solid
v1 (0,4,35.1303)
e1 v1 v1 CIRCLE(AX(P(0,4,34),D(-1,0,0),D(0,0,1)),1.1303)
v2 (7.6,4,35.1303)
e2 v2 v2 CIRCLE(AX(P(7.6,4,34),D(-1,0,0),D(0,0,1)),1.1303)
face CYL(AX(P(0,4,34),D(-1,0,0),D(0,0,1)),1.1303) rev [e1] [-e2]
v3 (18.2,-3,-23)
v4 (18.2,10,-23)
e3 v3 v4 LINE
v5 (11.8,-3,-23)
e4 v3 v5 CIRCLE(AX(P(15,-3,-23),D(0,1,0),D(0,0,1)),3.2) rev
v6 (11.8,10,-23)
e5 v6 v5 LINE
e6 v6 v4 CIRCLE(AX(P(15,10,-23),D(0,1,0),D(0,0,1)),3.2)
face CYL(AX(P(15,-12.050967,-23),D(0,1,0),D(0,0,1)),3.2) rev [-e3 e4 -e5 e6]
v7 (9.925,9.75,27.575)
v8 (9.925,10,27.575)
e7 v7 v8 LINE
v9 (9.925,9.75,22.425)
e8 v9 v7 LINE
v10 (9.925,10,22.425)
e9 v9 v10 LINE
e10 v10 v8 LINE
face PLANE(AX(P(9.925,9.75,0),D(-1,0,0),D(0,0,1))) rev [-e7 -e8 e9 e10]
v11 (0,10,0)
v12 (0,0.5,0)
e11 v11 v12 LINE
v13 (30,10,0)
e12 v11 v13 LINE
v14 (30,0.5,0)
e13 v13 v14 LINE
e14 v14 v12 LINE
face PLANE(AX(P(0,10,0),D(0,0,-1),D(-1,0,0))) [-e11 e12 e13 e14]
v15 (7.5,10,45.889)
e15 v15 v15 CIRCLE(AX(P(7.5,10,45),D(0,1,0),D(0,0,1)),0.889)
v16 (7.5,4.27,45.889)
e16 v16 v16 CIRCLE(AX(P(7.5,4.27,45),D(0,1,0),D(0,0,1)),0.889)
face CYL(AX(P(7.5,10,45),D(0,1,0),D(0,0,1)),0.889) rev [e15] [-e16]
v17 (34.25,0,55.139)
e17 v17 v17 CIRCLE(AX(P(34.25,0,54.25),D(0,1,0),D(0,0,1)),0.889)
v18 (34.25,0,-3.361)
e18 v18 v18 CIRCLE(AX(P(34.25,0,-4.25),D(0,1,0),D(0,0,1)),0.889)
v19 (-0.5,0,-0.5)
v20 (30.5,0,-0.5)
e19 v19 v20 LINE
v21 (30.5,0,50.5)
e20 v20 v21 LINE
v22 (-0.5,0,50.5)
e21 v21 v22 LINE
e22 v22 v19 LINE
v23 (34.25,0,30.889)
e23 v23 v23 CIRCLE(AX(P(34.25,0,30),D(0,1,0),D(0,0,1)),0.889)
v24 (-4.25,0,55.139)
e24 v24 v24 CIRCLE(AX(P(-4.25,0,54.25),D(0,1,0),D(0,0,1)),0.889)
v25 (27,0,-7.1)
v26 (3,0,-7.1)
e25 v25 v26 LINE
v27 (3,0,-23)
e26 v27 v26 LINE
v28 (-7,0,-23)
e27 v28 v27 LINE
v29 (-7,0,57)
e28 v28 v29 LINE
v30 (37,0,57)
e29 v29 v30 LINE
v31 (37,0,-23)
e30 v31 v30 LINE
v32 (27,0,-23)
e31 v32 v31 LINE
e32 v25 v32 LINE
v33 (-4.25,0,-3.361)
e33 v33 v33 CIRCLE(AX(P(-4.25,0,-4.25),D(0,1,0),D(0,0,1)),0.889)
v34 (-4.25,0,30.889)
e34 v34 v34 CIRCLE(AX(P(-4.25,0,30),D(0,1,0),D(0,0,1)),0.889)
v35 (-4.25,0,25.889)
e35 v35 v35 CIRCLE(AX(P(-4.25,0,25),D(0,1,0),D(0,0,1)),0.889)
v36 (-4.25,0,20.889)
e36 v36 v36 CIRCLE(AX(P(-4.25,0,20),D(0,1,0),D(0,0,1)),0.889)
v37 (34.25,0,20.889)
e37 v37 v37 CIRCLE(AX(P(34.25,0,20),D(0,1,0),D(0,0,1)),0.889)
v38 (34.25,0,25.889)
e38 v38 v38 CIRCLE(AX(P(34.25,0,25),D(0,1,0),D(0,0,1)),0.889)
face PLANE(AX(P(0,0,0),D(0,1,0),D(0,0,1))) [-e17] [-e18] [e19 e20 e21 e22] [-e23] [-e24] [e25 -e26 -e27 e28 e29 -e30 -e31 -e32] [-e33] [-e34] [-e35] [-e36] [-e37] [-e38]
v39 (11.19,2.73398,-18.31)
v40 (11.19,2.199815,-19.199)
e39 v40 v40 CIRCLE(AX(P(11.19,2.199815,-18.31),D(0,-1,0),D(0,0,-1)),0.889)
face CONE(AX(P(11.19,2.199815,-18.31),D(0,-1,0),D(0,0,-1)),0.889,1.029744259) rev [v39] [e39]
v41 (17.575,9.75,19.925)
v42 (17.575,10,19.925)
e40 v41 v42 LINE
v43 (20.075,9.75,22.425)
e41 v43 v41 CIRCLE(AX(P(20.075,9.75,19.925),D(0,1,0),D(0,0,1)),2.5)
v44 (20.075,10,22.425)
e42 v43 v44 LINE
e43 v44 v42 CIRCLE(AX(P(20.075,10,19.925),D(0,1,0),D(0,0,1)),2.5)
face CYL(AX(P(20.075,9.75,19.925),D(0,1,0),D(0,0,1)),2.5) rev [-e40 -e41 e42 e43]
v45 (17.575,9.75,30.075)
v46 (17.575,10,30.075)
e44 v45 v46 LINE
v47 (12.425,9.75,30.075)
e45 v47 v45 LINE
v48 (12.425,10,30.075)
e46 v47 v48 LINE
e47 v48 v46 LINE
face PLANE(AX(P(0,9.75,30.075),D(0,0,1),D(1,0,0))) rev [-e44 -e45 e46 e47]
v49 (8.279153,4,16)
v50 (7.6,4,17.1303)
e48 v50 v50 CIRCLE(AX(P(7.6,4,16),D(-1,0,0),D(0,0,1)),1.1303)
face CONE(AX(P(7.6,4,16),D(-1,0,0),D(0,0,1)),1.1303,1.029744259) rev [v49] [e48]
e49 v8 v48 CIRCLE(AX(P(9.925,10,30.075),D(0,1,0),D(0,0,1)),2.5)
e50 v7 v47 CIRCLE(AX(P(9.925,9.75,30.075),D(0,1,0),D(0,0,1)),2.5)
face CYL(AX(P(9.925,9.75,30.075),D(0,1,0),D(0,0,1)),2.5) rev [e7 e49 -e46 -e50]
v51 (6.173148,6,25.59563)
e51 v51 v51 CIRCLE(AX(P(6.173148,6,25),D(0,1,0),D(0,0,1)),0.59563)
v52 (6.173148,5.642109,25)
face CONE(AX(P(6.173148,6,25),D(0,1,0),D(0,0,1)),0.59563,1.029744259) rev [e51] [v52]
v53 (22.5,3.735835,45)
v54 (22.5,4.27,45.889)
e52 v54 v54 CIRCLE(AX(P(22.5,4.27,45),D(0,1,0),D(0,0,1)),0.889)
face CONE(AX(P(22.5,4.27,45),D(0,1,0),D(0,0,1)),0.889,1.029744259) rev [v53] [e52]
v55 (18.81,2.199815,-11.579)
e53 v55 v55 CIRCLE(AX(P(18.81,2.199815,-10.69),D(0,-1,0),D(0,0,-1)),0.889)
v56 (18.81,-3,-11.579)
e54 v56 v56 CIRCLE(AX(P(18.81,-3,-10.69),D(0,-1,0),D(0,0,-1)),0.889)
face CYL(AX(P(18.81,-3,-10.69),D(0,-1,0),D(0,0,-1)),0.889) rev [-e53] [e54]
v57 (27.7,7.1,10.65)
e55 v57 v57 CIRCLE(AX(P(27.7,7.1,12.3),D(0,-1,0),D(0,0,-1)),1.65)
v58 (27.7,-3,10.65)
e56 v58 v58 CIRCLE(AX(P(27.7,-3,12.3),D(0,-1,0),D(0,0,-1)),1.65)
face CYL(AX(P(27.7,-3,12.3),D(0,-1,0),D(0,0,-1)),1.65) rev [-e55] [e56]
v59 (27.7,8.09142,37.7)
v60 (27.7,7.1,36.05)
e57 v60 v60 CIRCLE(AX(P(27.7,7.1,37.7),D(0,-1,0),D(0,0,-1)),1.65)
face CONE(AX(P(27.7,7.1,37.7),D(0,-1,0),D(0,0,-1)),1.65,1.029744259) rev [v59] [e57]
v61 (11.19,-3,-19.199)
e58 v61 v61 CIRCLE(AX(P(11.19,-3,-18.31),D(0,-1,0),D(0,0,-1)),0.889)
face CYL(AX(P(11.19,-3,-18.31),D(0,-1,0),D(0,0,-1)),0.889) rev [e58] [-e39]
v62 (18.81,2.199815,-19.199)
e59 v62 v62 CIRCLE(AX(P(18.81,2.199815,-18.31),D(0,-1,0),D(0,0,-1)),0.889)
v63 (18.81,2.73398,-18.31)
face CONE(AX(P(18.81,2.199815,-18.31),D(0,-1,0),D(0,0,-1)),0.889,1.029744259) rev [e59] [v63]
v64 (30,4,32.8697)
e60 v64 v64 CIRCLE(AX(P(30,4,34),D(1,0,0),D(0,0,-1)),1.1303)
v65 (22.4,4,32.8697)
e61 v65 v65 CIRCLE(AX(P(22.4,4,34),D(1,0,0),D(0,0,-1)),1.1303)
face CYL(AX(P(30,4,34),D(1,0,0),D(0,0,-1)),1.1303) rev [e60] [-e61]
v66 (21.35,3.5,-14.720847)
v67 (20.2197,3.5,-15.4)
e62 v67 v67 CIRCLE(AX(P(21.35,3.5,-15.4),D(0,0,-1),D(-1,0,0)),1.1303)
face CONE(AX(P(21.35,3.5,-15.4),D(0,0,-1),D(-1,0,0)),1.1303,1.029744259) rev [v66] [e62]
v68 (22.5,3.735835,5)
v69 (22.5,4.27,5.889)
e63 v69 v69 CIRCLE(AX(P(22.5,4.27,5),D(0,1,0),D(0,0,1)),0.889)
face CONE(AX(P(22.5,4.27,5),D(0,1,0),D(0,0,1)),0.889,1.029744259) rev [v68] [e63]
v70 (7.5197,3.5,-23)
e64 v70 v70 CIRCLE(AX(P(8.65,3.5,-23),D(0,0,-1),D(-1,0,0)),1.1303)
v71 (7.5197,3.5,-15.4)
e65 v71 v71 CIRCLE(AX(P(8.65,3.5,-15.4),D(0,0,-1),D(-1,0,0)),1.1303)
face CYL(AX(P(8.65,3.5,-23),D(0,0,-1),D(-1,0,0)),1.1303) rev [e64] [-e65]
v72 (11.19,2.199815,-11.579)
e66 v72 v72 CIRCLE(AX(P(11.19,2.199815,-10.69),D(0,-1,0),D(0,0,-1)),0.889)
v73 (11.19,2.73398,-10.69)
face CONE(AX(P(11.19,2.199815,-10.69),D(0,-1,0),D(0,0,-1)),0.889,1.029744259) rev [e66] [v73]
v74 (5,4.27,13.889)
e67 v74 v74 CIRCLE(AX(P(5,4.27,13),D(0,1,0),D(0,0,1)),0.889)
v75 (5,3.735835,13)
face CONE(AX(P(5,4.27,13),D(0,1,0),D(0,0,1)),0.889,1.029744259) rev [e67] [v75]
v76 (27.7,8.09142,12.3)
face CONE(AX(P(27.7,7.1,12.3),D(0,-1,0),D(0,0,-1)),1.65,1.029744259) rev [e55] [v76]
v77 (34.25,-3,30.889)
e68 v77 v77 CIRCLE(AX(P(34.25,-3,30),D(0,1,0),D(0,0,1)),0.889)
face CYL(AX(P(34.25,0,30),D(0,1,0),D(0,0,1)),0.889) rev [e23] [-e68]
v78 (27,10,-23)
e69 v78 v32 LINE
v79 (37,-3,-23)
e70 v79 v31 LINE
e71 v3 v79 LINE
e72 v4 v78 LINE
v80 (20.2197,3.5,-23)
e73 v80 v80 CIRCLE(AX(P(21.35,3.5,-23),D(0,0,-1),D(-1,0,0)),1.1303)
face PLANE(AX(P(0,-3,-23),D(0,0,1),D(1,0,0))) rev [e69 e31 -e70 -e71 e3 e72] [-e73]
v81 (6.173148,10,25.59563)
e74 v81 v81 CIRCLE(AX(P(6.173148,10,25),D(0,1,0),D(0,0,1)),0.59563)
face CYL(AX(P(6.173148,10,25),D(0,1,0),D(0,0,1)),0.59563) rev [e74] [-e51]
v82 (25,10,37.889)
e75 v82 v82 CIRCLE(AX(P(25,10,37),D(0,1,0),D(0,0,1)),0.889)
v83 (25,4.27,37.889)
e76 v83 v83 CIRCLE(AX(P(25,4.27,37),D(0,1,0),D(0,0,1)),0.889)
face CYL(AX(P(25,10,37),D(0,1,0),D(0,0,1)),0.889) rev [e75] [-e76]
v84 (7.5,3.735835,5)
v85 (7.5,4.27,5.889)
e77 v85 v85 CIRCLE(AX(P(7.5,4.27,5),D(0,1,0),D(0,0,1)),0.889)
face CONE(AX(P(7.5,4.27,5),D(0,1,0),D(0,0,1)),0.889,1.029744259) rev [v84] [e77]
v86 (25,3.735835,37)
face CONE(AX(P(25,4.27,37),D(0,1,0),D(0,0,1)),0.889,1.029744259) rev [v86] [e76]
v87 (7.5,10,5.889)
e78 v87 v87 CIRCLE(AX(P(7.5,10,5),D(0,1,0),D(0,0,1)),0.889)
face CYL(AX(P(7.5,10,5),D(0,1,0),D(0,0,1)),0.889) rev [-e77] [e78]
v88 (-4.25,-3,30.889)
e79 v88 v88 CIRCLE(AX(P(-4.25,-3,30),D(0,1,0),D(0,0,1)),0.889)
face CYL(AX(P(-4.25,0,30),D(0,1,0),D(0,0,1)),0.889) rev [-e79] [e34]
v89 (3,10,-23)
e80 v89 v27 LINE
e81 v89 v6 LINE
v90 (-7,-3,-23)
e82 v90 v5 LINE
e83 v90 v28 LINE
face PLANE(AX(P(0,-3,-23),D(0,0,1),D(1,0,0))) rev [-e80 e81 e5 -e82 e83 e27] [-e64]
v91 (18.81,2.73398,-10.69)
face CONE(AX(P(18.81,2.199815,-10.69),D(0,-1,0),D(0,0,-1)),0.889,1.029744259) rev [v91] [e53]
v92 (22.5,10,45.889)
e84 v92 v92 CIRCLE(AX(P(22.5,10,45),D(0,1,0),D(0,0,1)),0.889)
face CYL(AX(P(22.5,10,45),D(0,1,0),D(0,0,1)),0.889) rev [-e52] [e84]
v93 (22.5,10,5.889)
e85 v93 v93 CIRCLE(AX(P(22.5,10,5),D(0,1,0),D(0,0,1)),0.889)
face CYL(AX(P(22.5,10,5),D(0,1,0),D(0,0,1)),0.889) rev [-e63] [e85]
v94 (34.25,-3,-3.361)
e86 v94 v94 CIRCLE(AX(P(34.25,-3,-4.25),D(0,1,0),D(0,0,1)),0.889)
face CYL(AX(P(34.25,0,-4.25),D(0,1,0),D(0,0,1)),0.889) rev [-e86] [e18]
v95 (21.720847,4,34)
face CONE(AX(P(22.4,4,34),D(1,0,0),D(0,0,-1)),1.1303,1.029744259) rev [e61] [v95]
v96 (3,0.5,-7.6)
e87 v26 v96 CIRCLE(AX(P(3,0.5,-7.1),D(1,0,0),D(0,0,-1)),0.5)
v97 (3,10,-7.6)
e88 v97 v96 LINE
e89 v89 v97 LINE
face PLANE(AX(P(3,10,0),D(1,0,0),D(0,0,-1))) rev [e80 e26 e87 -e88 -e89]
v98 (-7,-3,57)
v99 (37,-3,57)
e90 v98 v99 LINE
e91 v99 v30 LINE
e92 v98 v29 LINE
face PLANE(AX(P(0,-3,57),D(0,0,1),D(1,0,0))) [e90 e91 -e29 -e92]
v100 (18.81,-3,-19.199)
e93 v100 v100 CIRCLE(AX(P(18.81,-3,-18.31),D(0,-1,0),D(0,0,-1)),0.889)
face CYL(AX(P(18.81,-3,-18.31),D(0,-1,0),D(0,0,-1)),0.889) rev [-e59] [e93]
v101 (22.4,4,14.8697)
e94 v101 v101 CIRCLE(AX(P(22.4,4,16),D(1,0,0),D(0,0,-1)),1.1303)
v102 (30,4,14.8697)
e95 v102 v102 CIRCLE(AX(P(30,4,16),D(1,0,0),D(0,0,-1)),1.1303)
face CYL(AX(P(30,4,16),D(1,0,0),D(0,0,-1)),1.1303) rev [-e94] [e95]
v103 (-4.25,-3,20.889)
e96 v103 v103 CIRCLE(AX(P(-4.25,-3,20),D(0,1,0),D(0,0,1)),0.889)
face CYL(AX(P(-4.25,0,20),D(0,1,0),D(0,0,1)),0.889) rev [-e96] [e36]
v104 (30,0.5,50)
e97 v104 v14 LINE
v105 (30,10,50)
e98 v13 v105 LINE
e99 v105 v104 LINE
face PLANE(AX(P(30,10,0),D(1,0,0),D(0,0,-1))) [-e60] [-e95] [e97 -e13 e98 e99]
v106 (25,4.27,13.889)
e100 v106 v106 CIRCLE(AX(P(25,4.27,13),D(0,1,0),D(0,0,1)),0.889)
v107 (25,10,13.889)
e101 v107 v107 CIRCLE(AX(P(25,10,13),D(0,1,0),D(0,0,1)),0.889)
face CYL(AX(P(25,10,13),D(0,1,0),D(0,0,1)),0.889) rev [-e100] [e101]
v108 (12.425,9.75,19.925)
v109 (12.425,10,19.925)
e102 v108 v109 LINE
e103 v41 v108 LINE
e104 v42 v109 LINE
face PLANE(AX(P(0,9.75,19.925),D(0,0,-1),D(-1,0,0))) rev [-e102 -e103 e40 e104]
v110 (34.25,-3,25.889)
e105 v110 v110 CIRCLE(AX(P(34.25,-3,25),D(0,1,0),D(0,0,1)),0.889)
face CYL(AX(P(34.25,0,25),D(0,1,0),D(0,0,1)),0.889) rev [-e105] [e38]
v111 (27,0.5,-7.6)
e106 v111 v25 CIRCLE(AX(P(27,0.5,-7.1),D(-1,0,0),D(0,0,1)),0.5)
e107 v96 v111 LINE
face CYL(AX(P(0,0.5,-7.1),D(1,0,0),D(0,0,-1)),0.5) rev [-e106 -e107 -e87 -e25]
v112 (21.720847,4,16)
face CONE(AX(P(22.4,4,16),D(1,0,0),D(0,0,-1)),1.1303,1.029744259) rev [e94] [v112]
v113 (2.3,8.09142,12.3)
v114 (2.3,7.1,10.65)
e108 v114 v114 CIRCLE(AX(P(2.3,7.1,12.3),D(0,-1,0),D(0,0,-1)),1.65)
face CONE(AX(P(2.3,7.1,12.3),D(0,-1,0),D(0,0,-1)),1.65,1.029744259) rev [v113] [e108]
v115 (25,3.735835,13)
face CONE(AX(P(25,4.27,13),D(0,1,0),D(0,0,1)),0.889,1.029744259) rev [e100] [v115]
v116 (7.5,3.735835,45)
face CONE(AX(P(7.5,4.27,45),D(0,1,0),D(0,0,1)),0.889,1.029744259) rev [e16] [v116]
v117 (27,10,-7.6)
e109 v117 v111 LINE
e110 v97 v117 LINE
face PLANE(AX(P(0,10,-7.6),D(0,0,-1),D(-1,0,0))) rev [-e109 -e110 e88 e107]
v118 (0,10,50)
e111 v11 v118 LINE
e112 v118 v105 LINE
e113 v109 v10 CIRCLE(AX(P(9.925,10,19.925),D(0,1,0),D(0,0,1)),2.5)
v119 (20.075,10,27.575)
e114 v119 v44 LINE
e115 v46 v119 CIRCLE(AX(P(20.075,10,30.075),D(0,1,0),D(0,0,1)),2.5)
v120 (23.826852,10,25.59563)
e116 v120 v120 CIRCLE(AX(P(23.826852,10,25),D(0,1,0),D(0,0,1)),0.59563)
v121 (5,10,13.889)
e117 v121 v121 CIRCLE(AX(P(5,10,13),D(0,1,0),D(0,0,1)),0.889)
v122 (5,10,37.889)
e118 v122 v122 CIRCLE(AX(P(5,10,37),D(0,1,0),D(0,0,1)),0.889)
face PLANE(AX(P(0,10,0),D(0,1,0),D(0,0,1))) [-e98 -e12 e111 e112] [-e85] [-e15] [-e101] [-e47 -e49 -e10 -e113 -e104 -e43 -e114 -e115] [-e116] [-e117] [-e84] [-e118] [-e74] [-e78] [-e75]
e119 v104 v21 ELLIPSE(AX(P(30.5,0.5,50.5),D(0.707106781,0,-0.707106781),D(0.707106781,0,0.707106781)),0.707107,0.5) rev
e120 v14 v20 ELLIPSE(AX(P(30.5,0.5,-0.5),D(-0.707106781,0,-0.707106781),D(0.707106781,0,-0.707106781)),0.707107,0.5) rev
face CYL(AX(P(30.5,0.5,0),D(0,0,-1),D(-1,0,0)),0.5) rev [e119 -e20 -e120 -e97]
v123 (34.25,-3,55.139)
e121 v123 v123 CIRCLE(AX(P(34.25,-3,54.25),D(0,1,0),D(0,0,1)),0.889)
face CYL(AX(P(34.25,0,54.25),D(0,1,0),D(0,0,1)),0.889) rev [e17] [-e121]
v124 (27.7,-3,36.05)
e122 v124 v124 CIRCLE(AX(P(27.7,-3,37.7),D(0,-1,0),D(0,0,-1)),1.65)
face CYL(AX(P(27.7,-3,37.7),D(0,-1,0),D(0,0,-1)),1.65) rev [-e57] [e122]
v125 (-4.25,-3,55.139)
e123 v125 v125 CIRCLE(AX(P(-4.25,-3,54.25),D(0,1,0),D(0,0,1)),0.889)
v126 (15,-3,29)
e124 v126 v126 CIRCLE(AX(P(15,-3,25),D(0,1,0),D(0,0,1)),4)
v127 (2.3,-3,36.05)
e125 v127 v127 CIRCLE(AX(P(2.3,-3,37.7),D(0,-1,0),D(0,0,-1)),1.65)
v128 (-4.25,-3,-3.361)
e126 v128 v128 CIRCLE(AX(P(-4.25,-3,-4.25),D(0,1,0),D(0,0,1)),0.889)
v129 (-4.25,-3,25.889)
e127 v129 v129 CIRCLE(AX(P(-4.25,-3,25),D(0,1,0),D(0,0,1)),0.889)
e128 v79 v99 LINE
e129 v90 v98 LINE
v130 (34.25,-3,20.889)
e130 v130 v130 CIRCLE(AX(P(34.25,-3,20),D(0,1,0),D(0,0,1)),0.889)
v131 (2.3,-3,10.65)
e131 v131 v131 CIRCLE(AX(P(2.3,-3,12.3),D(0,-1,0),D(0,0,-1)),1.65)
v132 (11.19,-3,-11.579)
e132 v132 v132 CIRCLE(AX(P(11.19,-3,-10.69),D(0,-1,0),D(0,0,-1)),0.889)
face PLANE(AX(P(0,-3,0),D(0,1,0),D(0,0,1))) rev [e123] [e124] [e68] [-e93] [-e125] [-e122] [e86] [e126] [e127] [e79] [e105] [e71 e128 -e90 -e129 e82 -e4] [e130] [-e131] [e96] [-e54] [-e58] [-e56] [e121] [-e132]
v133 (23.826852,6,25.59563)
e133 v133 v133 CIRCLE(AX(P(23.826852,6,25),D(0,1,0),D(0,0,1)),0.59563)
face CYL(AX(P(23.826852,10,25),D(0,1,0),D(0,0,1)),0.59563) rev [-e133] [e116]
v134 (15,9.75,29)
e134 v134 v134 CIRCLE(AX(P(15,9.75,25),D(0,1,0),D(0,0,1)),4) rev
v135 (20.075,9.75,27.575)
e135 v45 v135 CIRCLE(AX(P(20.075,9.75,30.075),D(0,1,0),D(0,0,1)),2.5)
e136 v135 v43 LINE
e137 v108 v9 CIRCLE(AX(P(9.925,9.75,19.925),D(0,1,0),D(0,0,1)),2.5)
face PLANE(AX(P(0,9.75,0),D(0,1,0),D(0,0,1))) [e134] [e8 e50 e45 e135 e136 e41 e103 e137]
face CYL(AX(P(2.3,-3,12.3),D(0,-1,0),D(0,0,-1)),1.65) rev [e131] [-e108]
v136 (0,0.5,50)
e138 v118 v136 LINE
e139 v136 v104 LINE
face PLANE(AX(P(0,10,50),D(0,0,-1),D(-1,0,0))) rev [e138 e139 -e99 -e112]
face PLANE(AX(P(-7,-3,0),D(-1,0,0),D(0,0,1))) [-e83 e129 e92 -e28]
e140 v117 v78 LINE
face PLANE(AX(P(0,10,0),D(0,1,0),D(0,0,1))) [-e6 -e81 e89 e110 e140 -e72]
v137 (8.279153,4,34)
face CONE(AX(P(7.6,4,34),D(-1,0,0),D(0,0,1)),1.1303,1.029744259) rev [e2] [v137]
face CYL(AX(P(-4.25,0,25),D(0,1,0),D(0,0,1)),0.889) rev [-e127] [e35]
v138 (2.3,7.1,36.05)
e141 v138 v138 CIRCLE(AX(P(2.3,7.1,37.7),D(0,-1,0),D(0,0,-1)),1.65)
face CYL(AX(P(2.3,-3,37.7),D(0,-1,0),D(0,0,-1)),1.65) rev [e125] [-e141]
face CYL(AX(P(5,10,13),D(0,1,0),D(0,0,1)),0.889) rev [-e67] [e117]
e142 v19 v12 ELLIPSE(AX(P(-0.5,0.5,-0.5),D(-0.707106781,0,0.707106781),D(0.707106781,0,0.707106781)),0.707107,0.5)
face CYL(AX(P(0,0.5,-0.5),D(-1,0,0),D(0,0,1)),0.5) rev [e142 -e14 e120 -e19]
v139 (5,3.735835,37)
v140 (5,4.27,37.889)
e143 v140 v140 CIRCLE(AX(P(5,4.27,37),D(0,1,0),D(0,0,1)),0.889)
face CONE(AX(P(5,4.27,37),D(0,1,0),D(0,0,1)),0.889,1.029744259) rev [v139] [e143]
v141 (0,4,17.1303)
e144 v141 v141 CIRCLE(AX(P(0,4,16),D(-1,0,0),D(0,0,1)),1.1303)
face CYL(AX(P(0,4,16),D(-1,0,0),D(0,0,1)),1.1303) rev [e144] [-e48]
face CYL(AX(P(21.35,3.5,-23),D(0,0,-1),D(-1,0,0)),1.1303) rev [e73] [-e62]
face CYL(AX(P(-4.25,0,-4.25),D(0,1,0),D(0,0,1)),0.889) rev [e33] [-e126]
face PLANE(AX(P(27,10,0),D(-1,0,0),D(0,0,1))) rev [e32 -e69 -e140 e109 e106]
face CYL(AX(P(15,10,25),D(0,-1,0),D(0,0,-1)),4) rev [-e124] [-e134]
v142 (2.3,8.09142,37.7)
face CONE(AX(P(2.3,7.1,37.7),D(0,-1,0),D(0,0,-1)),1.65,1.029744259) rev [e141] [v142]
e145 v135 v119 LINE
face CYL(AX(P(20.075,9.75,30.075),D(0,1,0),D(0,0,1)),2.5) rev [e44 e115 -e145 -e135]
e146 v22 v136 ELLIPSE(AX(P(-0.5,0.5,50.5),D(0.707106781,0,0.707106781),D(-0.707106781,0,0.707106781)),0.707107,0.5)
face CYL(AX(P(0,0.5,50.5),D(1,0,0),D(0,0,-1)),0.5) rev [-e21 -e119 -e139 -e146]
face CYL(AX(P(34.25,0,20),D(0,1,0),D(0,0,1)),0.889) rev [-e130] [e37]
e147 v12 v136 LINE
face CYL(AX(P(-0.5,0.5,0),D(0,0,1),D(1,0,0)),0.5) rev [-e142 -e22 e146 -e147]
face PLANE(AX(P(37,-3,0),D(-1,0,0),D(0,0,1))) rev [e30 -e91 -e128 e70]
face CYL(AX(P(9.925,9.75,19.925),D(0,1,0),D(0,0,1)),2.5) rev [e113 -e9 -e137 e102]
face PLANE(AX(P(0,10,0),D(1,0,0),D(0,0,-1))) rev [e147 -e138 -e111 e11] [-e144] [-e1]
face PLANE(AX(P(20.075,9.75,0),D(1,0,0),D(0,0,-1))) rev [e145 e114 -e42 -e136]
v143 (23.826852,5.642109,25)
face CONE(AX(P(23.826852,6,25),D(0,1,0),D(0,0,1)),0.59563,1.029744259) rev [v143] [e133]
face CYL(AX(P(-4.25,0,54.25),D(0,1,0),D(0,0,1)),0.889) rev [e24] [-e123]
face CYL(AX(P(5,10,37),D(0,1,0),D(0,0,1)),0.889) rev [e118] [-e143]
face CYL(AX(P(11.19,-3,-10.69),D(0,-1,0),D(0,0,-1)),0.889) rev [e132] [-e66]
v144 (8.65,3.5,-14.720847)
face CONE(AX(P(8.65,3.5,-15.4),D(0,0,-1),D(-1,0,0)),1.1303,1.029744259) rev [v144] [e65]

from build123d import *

# Parameters (mm, degrees)
MAIN_BODY_SKETCH_W           = 30
MAIN_BODY_SKETCH_H           = 15
MAIN_BODY_SKETCH_H_2         = 20
MAIN_BODY_SKETCH_R           = 4
MAIN_BODY_DEPTH              = 10
BASE_PLATE_START             = -3
MAIN_BODY_SKETCH_7_W         = 44
MAIN_BODY_SKETCH_7_H         = 80
MAIN_BODY_SKETCH_7_R         = 4
BASE_PLATE_DEPTH             = 3
F_2_56_LID_TAPPED_HOLE2_D    = 1.778
MAIN_BODY_SKETCH_8_W         = 24
MAIN_BODY_SKETCH_8_H         = 15.4
BASE_2_HOLE_CLAMP_POST_DEPTH = 10
F_2_56_TAPPED_HOLE1_D        = 1.778
F_2_56_TAPPED_HOLE1_DEPTH    = 5.19981491
F_2_56_TAPPED_HOLE1_TIP      = 0.53416509
ROD_DIM_SKETCH_R             = 3.2
COLD_ROD_CUT_DEPTH           = 13
F_4_40_TAPPED_HOLE3_D        = 2.2606
F_4_40_TAPPED_HOLE3_DEPTH    = 7.6
F_4_40_TAPPED_HOLE3_TIP      = 0.679152758
CHIP_SOCKET_START            = -0.25
CHIP_POCKET_SKETCH_R         = 2.5
CHIP_POCKET_SKETCH_W         = 10.15
CHIP_POCKET_SKETCH_H         = 10.15
CHIP_POCKET_SKETCH_R_2       = 4
CHIP_SOCKET_DEPTH            = 0.25
M4X0_7_TAPPED_HOLE2_D        = 3.3
M4X0_7_TAPPED_HOLE2_DEPTH    = 10.1
M4X0_7_TAPPED_HOLE2_TIP      = 0.991420021
F_0_80_TAPPED_HOLE1_D        = 1.19126
F_0_80_TAPPED_HOLE1_DEPTH    = 4
F_0_80_TAPPED_HOLE1_TIP      = 0.357890611
FILLET1_R                    = 0.5


# Read off the part's stored shape, not the designer's step: Heat_Cart_mirror_holes
with BuildPart() as part:
    # Main_Body_Sketch → Main_Body (new body)
    # profile 1 of 3: a face of its own
    with BuildSketch(Plane(origin=(0, 0, 0), x_dir=(1, 0, 0), z_dir=(0, 1, 0))):
        with Locations((15, -42.5)):
            Rectangle(MAIN_BODY_SKETCH_W, MAIN_BODY_SKETCH_H)
    # profile 2 of 3: a face of its own
    with BuildSketch(Plane(origin=(0, 0, 0), x_dir=(1, 0, 0), z_dir=(0, 1, 0))):
        with Locations((15, -25)):
            Rectangle(MAIN_BODY_SKETCH_W, MAIN_BODY_SKETCH_H_2)
        with Locations(Location((15, -25, 0), (0, 0, 270))):
            Circle(MAIN_BODY_SKETCH_R, mode=Mode.SUBTRACT)
    # profile 3 of 3: a face of its own
    with BuildSketch(Plane(origin=(0, 0, 0), x_dir=(1, 0, 0), z_dir=(0, 1, 0))):
        with Locations((15, -7.5)):
            Rectangle(MAIN_BODY_SKETCH_W, MAIN_BODY_SKETCH_H)
    extrude(amount=MAIN_BODY_DEPTH)

    # Heat_Cart_mirror_holes outline → Heat_Cart_mirror_holes (revolve, cut)
    with BuildSketch(Plane(origin=(7.5, 0, 45), x_dir=(1, 0, 0), z_dir=(0, 0, 1))):
        Polygon((0, 10), (0, 3.73583491), (0.889, 4.27), (0.889, 10), align=None)
    revolve(axis=Axis((7.5, 0, 45), (0, 1, 0)), mode=Mode.SUBTRACT)

    # Heat_Cart_mirror_holes 2 outline → Heat_Cart_mirror_holes 2 (revolve, cut)
    with BuildSketch(Plane(origin=(7.5, 0, 5), x_dir=(1, 0, 0), z_dir=(0, 0, 1))):
        Polygon((0, 10), (0, 3.73583491), (0.889, 4.27), (0.889, 10), align=None)
    revolve(axis=Axis((7.5, 0, 5), (0, 1, 0)), mode=Mode.SUBTRACT)

    # Heat_Cart_mirror_holes 3 outline → Heat_Cart_mirror_holes 3 (revolve, cut)
    with BuildSketch(Plane(origin=(22.5, 0, 45), x_dir=(1, 0, 0), z_dir=(0, 0, 1))):
        Polygon((0, 10), (0, 3.73583491), (0.889, 4.27), (0.889, 10), align=None)
    revolve(axis=Axis((22.5, 0, 45), (0, 1, 0)), mode=Mode.SUBTRACT)

    # Heat_Cart_mirror_holes 4 outline → Heat_Cart_mirror_holes 4 (revolve, cut)
    with BuildSketch(Plane(origin=(22.5, 0, 5), x_dir=(1, 0, 0), z_dir=(0, 0, 1))):
        Polygon((0, 10), (0, 3.73583491), (0.889, 4.27), (0.889, 10), align=None)
    revolve(axis=Axis((22.5, 0, 5), (0, 1, 0)), mode=Mode.SUBTRACT)

    # Heat_Cart_mirror_holes 5 outline → Heat_Cart_mirror_holes 5 (revolve, cut)
    with BuildSketch(Plane(origin=(25, 0, 37), x_dir=(1, 0, 0), z_dir=(0, 0, 1))):
        Polygon((0, 10), (0, 3.73583491), (0.889, 4.27), (0.889, 10), align=None)
    revolve(axis=Axis((25, 0, 37), (0, 1, 0)), mode=Mode.SUBTRACT)

    # Heat_Cart_mirror_holes 6 outline → Heat_Cart_mirror_holes 6 (revolve, cut)
    with BuildSketch(Plane(origin=(5, 0, 37), x_dir=(1, 0, 0), z_dir=(0, 0, 1))):
        Polygon((0, 10), (0, 3.73583491), (0.889, 4.27), (0.889, 10), align=None)
    revolve(axis=Axis((5, 0, 37), (0, 1, 0)), mode=Mode.SUBTRACT)

    # Heat_Cart_mirror_holes 7 outline → Heat_Cart_mirror_holes 7 (revolve, cut)
    with BuildSketch(Plane(origin=(25, 0, 13), x_dir=(1, 0, 0), z_dir=(0, 0, 1))):
        Polygon((0, 10), (0, 3.73583491), (0.889, 4.27), (0.889, 10), align=None)
    revolve(axis=Axis((25, 0, 13), (0, 1, 0)), mode=Mode.SUBTRACT)

    # Heat_Cart_mirror_holes 8 outline → Heat_Cart_mirror_holes 8 (revolve, cut)
    with BuildSketch(Plane(origin=(5, 0, 13), x_dir=(1, 0, 0), z_dir=(0, 0, 1))):
        Polygon((0, 10), (0, 3.73583491), (0.889, 4.27), (0.889, 10), align=None)
    revolve(axis=Axis((5, 0, 13), (0, 1, 0)), mode=Mode.SUBTRACT)

    # Heat_Cart_mirror_holes 9 outline → Heat_Cart_mirror_holes 9 (revolve, cut)
    with BuildSketch(Plane(origin=(0, 4, 16), x_dir=(0, 1, 0), z_dir=(0, 0, -1))):
        Polygon((0, 30), (0, 21.720847242), (1.1303, 22.4), (1.1303, 30), align=None)
        Polygon((1.1303, 7.6), (0, 8.279152758), (0, 0), (1.1303, 0), align=None)
    revolve(axis=Axis((0, 4, 16), (1, 0, 0)), mode=Mode.SUBTRACT)

    # Heat_Cart_mirror_holes 10 outline → Heat_Cart_mirror_holes 10 (revolve, cut)
    with BuildSketch(Plane(origin=(0, 4, 34), x_dir=(0, 1, 0), z_dir=(0, 0, -1))):
        Polygon((0, 30), (0, 21.720847242), (1.1303, 22.4), (1.1303, 30), align=None)
        Polygon((1.1303, 7.6), (0, 8.279152758), (0, 0), (1.1303, 0), align=None)
    revolve(axis=Axis((0, 4, 34), (1, 0, 0)), mode=Mode.SUBTRACT)

    # Main_Body_Sketch<7> → Base_Plate (add)
    with BuildSketch(Plane(origin=(0, 0, 0), x_dir=(1, 0, 0), z_dir=(0, 1, 0)).offset(BASE_PLATE_START)):
        with Locations((15, -17)):
            Rectangle(MAIN_BODY_SKETCH_7_W, MAIN_BODY_SKETCH_7_H)
        with Locations(Location((15, -25, 0), (0, 0, 270))):
            Circle(MAIN_BODY_SKETCH_7_R, mode=Mode.SUBTRACT)
    extrude(amount=BASE_PLATE_DEPTH)

    # #2-56 Lid Tapped Hole2 (through all)
    with Locations(Plane(origin=(-4.25, 0, -4.25), x_dir=(0, 0, 1), z_dir=(0, 1, 0))):
        with Locations((0, 0), (29.25, 0), (34.25, 0), (58.5, 0), (58.5, 38.5), (34.25, 38.5), (29.25, 38.5), (0, 38.5), (24.25, 0), (24.25, 38.5)):
            Hole(F_2_56_LID_TAPPED_HOLE2_D / 2)

    # Main_Body_Sketch<8> → Base_2_Hole_clamp_Post (add)
    with BuildSketch(Plane(origin=(0, 0, 0), x_dir=(1, 0, 0), z_dir=(0, 1, 0))):
        with Locations((15, 15.3)):
            Rectangle(MAIN_BODY_SKETCH_8_W, MAIN_BODY_SKETCH_8_H)
    extrude(amount=BASE_2_HOLE_CLAMP_POST_DEPTH)

    # #2-56 Tapped Hole1
    with Locations(Plane(origin=(11.19, -3, -18.31), x_dir=(0, 0, -1), z_dir=(0, -1, 0))):
        with Locations((0, 0), (-7.62, 7.62), (-7.62, 0), (0, 7.62)):
            Hole(F_2_56_TAPPED_HOLE1_D / 2, depth=F_2_56_TAPPED_HOLE1_DEPTH)
            with Locations((0, 0, -(F_2_56_TAPPED_HOLE1_DEPTH + F_2_56_TAPPED_HOLE1_TIP / 2))):  # 118° drill point
                Cone(0, F_2_56_TAPPED_HOLE1_D / 2, F_2_56_TAPPED_HOLE1_TIP, mode=Mode.SUBTRACT)

    # Rod_Dim_sketch → Cold_Rod_Cut (cut)
    with BuildSketch(Plane(origin=(0, 10, 0), x_dir=(1, 0, 0), z_dir=(0, 1, 0))):
        with Locations((15, 23)):
            Circle(ROD_DIM_SKETCH_R)
    extrude(amount=-COLD_ROD_CUT_DEPTH, mode=Mode.SUBTRACT)

    # #4-40 Tapped Hole3
    with Locations(Plane(origin=(21.35, 3.5, -23), x_dir=(-1, 0, 0), z_dir=(0, 0, -1))):
        with Locations((0, 0), (12.7, 0)):
            Hole(F_4_40_TAPPED_HOLE3_D / 2, depth=F_4_40_TAPPED_HOLE3_DEPTH)
            with Locations((0, 0, -(F_4_40_TAPPED_HOLE3_DEPTH + F_4_40_TAPPED_HOLE3_TIP / 2))):  # 118° drill point
                Cone(0, F_4_40_TAPPED_HOLE3_D / 2, F_4_40_TAPPED_HOLE3_TIP, mode=Mode.SUBTRACT)

    # Chip_Pocket_sketch → Chip_socket (cut)
    # profile 1 of 21: a face of its own
    with BuildSketch(Plane(origin=(0, 10, 0), x_dir=(1, 0, 0), z_dir=(0, 1, 0)).offset(CHIP_SOCKET_START)):
        with BuildLine():
            ThreePointArc((22.575, -19.925), (20.075, -17.425), (17.575, -19.925))
            Line((17.575, -19.925), (20.075, -19.925))
            Line((20.075, -19.925), (20.075, -22.425))
            ThreePointArc((20.075, -22.425), (21.842766953, -21.692766953), (22.575, -19.925))
        make_face()
    # profile 2 of 21: a face of its own
    with BuildSketch(Plane(origin=(0, 10, 0), x_dir=(1, 0, 0), z_dir=(0, 1, 0)).offset(CHIP_SOCKET_START)):
        with BuildLine():
            Line((20.075, -19.925), (17.575, -19.925))
            ThreePointArc((17.575, -19.925), (18.307233047, -21.692766953), (20.075, -22.425))
            Line((20.075, -22.425), (20.075, -19.925))
        make_face()
    # profile 3 of 21: a face of its own
    with BuildSketch(Plane(origin=(0, 10, 0), x_dir=(1, 0, 0), z_dir=(0, 1, 0)).offset(CHIP_SOCKET_START)):
        with BuildLine():
            ThreePointArc((22.575, -19.925), (20.075, -17.425), (17.575, -19.925))
            Line((17.575, -19.925), (20.075, -19.925))
            Line((20.075, -19.925), (20.075, -22.425))
            ThreePointArc((20.075, -22.425), (21.842766953, -21.692766953), (22.575, -19.925))
        make_face()
    # profile 4 of 21: a face of its own
    with BuildSketch(Plane(origin=(0, 10, 0), x_dir=(1, 0, 0), z_dir=(0, 1, 0)).offset(CHIP_SOCKET_START)):
        with BuildLine():
            Line((20.075, -19.925), (17.575, -19.925))
            ThreePointArc((17.575, -19.925), (18.307233047, -21.692766953), (20.075, -22.425))
            Line((20.075, -22.425), (20.075, -19.925))
        make_face()
    # profile 5 of 21: a face of its own
    with BuildSketch(Plane(origin=(0, 10, 0), x_dir=(1, 0, 0), z_dir=(0, 1, 0)).offset(CHIP_SOCKET_START)):
        with Locations((20.075, -30.075)):
            Circle(CHIP_POCKET_SKETCH_R)
    # profile 6 of 21: a face of its own
    with BuildSketch(Plane(origin=(0, 10, 0), x_dir=(1, 0, 0), z_dir=(0, 1, 0)).offset(CHIP_SOCKET_START)):
        with Locations((20.075, -19.925)):
            Circle(CHIP_POCKET_SKETCH_R)
    # profile 7 of 21: a face of its own
    with BuildSketch(Plane(origin=(0, 10, 0), x_dir=(1, 0, 0), z_dir=(0, 1, 0)).offset(CHIP_SOCKET_START)):
        with Locations((9.925, -19.925)):
            Circle(CHIP_POCKET_SKETCH_R)
    # profile 8 of 21: a face of its own
    with BuildSketch(Plane(origin=(0, 10, 0), x_dir=(1, 0, 0), z_dir=(0, 1, 0)).offset(CHIP_SOCKET_START)):
        with Locations((9.925, -30.075)):
            Circle(CHIP_POCKET_SKETCH_R)
    # profile 9 of 21: a face of its own
    with BuildSketch(Plane(origin=(0, 10, 0), x_dir=(1, 0, 0), z_dir=(0, 1, 0)).offset(CHIP_SOCKET_START)):
        with Locations((15, -25)):
            Rectangle(CHIP_POCKET_SKETCH_W, CHIP_POCKET_SKETCH_H)
        with Locations(Location((15, -25, 0), (0, 0, 270))):
            Circle(CHIP_POCKET_SKETCH_R_2, mode=Mode.SUBTRACT)
    # profile 10 of 21: a face of its own
    with BuildSketch(Plane(origin=(0, 10, 0), x_dir=(1, 0, 0), z_dir=(0, 1, 0)).offset(CHIP_SOCKET_START)):
        with BuildLine():
            ThreePointArc((20.075, -27.575), (18.307233047, -28.307233047), (17.575, -30.075))
            Line((17.575, -30.075), (20.075, -30.075))
            Line((20.075, -30.075), (20.075, -27.575))
        make_face()
    # profile 11 of 21: a face of its own
    with BuildSketch(Plane(origin=(0, 10, 0), x_dir=(1, 0, 0), z_dir=(0, 1, 0)).offset(CHIP_SOCKET_START)):
        with BuildLine():
            Line((20.075, -30.075), (17.575, -30.075))
            ThreePointArc((17.575, -30.075), (20.075, -32.575), (22.575, -30.075))
            ThreePointArc((22.575, -30.075), (21.842766953, -28.307233047), (20.075, -27.575))
            Line((20.075, -27.575), (20.075, -30.075))
        make_face()
    # profile 12 of 21: a face of its own
    with BuildSketch(Plane(origin=(0, 10, 0), x_dir=(1, 0, 0), z_dir=(0, 1, 0)).offset(CHIP_SOCKET_START)):
        with BuildLine():
            ThreePointArc((20.075, -27.575), (18.307233047, -28.307233047), (17.575, -30.075))
            Line((17.575, -30.075), (20.075, -30.075))
            Line((20.075, -30.075), (20.075, -27.575))
        make_face()
    # profile 13 of 21: a face of its own
    with BuildSketch(Plane(origin=(0, 10, 0), x_dir=(1, 0, 0), z_dir=(0, 1, 0)).offset(CHIP_SOCKET_START)):
        with BuildLine():
            Line((20.075, -30.075), (17.575, -30.075))
            ThreePointArc((17.575, -30.075), (20.075, -32.575), (22.575, -30.075))
            ThreePointArc((22.575, -30.075), (21.842766953, -28.307233047), (20.075, -27.575))
            Line((20.075, -27.575), (20.075, -30.075))
        make_face()
    # profile 14 of 21: a face of its own
    with BuildSketch(Plane(origin=(0, 10, 0), x_dir=(1, 0, 0), z_dir=(0, 1, 0)).offset(CHIP_SOCKET_START)):
        with BuildLine():
            ThreePointArc((12.425, -30.075), (11.692766953, -28.307233047), (9.925, -27.575))
            Line((9.925, -27.575), (9.925, -30.075))
            Line((9.925, -30.075), (12.425, -30.075))
        make_face()
    # profile 15 of 21: a face of its own
    with BuildSketch(Plane(origin=(0, 10, 0), x_dir=(1, 0, 0), z_dir=(0, 1, 0)).offset(CHIP_SOCKET_START)):
        with BuildLine():
            Line((9.925, -30.075), (9.925, -27.575))
            ThreePointArc((9.925, -27.575), (8.157233047, -31.842766953), (12.425, -30.075))
            Line((12.425, -30.075), (9.925, -30.075))
        make_face()
    # profile 16 of 21: a face of its own
    with BuildSketch(Plane(origin=(0, 10, 0), x_dir=(1, 0, 0), z_dir=(0, 1, 0)).offset(CHIP_SOCKET_START)):
        with BuildLine():
            ThreePointArc((12.425, -30.075), (11.692766953, -28.307233047), (9.925, -27.575))
            Line((9.925, -27.575), (9.925, -30.075))
            Line((9.925, -30.075), (12.425, -30.075))
        make_face()
    # profile 17 of 21: a face of its own
    with BuildSketch(Plane(origin=(0, 10, 0), x_dir=(1, 0, 0), z_dir=(0, 1, 0)).offset(CHIP_SOCKET_START)):
        with BuildLine():
            Line((9.925, -30.075), (9.925, -27.575))
            ThreePointArc((9.925, -27.575), (8.157233047, -31.842766953), (12.425, -30.075))
            Line((12.425, -30.075), (9.925, -30.075))
        make_face()
    # profile 18 of 21: a face of its own
    with BuildSketch(Plane(origin=(0, 10, 0), x_dir=(1, 0, 0), z_dir=(0, 1, 0)).offset(CHIP_SOCKET_START)):
        with BuildLine():
            Line((12.425, -19.925), (9.925, -19.925))
            Line((9.925, -19.925), (9.925, -22.425))
            ThreePointArc((9.925, -22.425), (11.692766953, -21.692766953), (12.425, -19.925))
        make_face()
    # profile 19 of 21: a face of its own
    with BuildSketch(Plane(origin=(0, 10, 0), x_dir=(1, 0, 0), z_dir=(0, 1, 0)).offset(CHIP_SOCKET_START)):
        with BuildLine():
            Line((9.925, -22.425), (9.925, -19.925))
            Line((9.925, -19.925), (12.425, -19.925))
            ThreePointArc((12.425, -19.925), (8.157233047, -18.157233047), (9.925, -22.425))
        make_face()
    # profile 20 of 21: a face of its own
    with BuildSketch(Plane(origin=(0, 10, 0), x_dir=(1, 0, 0), z_dir=(0, 1, 0)).offset(CHIP_SOCKET_START)):
        with BuildLine():
            Line((12.425, -19.925), (9.925, -19.925))
            Line((9.925, -19.925), (9.925, -22.425))
            ThreePointArc((9.925, -22.425), (11.692766953, -21.692766953), (12.425, -19.925))
        make_face()
    # profile 21 of 21: a face of its own
    with BuildSketch(Plane(origin=(0, 10, 0), x_dir=(1, 0, 0), z_dir=(0, 1, 0)).offset(CHIP_SOCKET_START)):
        with BuildLine():
            Line((9.925, -22.425), (9.925, -19.925))
            Line((9.925, -19.925), (12.425, -19.925))
            ThreePointArc((12.425, -19.925), (8.157233047, -18.157233047), (9.925, -22.425))
        make_face()
    extrude(amount=CHIP_SOCKET_DEPTH, mode=Mode.SUBTRACT)

    # M4x0.7 Tapped Hole2
    with Locations(Plane(origin=(2.3, -3, 37.7), x_dir=(0, 0, -1), z_dir=(0, -1, 0))):
        with Locations((0, 0), (0, 25.4), (25.4, 25.4), (25.4, 0)):
            Hole(M4X0_7_TAPPED_HOLE2_D / 2, depth=M4X0_7_TAPPED_HOLE2_DEPTH)
            with Locations((0, 0, -(M4X0_7_TAPPED_HOLE2_DEPTH + M4X0_7_TAPPED_HOLE2_TIP / 2))):  # 118° drill point
                Cone(0, M4X0_7_TAPPED_HOLE2_D / 2, M4X0_7_TAPPED_HOLE2_TIP, mode=Mode.SUBTRACT)

    # #0-80 Tapped Hole1
    with Locations(Plane(origin=(6.173148192, 10, 25), x_dir=(0, 0, 1), z_dir=(0, 1, 0))):
        with Locations((0, 0), (0, 17.653703616)):
            Hole(F_0_80_TAPPED_HOLE1_D / 2, depth=F_0_80_TAPPED_HOLE1_DEPTH)
            with Locations((0, 0, -(F_0_80_TAPPED_HOLE1_DEPTH + F_0_80_TAPPED_HOLE1_TIP / 2))):  # 118° drill point
                Cone(0, F_0_80_TAPPED_HOLE1_D / 2, F_0_80_TAPPED_HOLE1_TIP, mode=Mode.SUBTRACT)

    # Fillet1
    fillet1_edges = [part.edges().sort_by_distance(p)[0] for p in [
        (15, 0, -7.6),
        (15, 0, 50),
        (0, 0, 25),
        (15, 0, 0),
        (30, 0, 25),
    ]]
    fillet(fillet1_edges, radius=FILLET1_R)


solid = part.part
